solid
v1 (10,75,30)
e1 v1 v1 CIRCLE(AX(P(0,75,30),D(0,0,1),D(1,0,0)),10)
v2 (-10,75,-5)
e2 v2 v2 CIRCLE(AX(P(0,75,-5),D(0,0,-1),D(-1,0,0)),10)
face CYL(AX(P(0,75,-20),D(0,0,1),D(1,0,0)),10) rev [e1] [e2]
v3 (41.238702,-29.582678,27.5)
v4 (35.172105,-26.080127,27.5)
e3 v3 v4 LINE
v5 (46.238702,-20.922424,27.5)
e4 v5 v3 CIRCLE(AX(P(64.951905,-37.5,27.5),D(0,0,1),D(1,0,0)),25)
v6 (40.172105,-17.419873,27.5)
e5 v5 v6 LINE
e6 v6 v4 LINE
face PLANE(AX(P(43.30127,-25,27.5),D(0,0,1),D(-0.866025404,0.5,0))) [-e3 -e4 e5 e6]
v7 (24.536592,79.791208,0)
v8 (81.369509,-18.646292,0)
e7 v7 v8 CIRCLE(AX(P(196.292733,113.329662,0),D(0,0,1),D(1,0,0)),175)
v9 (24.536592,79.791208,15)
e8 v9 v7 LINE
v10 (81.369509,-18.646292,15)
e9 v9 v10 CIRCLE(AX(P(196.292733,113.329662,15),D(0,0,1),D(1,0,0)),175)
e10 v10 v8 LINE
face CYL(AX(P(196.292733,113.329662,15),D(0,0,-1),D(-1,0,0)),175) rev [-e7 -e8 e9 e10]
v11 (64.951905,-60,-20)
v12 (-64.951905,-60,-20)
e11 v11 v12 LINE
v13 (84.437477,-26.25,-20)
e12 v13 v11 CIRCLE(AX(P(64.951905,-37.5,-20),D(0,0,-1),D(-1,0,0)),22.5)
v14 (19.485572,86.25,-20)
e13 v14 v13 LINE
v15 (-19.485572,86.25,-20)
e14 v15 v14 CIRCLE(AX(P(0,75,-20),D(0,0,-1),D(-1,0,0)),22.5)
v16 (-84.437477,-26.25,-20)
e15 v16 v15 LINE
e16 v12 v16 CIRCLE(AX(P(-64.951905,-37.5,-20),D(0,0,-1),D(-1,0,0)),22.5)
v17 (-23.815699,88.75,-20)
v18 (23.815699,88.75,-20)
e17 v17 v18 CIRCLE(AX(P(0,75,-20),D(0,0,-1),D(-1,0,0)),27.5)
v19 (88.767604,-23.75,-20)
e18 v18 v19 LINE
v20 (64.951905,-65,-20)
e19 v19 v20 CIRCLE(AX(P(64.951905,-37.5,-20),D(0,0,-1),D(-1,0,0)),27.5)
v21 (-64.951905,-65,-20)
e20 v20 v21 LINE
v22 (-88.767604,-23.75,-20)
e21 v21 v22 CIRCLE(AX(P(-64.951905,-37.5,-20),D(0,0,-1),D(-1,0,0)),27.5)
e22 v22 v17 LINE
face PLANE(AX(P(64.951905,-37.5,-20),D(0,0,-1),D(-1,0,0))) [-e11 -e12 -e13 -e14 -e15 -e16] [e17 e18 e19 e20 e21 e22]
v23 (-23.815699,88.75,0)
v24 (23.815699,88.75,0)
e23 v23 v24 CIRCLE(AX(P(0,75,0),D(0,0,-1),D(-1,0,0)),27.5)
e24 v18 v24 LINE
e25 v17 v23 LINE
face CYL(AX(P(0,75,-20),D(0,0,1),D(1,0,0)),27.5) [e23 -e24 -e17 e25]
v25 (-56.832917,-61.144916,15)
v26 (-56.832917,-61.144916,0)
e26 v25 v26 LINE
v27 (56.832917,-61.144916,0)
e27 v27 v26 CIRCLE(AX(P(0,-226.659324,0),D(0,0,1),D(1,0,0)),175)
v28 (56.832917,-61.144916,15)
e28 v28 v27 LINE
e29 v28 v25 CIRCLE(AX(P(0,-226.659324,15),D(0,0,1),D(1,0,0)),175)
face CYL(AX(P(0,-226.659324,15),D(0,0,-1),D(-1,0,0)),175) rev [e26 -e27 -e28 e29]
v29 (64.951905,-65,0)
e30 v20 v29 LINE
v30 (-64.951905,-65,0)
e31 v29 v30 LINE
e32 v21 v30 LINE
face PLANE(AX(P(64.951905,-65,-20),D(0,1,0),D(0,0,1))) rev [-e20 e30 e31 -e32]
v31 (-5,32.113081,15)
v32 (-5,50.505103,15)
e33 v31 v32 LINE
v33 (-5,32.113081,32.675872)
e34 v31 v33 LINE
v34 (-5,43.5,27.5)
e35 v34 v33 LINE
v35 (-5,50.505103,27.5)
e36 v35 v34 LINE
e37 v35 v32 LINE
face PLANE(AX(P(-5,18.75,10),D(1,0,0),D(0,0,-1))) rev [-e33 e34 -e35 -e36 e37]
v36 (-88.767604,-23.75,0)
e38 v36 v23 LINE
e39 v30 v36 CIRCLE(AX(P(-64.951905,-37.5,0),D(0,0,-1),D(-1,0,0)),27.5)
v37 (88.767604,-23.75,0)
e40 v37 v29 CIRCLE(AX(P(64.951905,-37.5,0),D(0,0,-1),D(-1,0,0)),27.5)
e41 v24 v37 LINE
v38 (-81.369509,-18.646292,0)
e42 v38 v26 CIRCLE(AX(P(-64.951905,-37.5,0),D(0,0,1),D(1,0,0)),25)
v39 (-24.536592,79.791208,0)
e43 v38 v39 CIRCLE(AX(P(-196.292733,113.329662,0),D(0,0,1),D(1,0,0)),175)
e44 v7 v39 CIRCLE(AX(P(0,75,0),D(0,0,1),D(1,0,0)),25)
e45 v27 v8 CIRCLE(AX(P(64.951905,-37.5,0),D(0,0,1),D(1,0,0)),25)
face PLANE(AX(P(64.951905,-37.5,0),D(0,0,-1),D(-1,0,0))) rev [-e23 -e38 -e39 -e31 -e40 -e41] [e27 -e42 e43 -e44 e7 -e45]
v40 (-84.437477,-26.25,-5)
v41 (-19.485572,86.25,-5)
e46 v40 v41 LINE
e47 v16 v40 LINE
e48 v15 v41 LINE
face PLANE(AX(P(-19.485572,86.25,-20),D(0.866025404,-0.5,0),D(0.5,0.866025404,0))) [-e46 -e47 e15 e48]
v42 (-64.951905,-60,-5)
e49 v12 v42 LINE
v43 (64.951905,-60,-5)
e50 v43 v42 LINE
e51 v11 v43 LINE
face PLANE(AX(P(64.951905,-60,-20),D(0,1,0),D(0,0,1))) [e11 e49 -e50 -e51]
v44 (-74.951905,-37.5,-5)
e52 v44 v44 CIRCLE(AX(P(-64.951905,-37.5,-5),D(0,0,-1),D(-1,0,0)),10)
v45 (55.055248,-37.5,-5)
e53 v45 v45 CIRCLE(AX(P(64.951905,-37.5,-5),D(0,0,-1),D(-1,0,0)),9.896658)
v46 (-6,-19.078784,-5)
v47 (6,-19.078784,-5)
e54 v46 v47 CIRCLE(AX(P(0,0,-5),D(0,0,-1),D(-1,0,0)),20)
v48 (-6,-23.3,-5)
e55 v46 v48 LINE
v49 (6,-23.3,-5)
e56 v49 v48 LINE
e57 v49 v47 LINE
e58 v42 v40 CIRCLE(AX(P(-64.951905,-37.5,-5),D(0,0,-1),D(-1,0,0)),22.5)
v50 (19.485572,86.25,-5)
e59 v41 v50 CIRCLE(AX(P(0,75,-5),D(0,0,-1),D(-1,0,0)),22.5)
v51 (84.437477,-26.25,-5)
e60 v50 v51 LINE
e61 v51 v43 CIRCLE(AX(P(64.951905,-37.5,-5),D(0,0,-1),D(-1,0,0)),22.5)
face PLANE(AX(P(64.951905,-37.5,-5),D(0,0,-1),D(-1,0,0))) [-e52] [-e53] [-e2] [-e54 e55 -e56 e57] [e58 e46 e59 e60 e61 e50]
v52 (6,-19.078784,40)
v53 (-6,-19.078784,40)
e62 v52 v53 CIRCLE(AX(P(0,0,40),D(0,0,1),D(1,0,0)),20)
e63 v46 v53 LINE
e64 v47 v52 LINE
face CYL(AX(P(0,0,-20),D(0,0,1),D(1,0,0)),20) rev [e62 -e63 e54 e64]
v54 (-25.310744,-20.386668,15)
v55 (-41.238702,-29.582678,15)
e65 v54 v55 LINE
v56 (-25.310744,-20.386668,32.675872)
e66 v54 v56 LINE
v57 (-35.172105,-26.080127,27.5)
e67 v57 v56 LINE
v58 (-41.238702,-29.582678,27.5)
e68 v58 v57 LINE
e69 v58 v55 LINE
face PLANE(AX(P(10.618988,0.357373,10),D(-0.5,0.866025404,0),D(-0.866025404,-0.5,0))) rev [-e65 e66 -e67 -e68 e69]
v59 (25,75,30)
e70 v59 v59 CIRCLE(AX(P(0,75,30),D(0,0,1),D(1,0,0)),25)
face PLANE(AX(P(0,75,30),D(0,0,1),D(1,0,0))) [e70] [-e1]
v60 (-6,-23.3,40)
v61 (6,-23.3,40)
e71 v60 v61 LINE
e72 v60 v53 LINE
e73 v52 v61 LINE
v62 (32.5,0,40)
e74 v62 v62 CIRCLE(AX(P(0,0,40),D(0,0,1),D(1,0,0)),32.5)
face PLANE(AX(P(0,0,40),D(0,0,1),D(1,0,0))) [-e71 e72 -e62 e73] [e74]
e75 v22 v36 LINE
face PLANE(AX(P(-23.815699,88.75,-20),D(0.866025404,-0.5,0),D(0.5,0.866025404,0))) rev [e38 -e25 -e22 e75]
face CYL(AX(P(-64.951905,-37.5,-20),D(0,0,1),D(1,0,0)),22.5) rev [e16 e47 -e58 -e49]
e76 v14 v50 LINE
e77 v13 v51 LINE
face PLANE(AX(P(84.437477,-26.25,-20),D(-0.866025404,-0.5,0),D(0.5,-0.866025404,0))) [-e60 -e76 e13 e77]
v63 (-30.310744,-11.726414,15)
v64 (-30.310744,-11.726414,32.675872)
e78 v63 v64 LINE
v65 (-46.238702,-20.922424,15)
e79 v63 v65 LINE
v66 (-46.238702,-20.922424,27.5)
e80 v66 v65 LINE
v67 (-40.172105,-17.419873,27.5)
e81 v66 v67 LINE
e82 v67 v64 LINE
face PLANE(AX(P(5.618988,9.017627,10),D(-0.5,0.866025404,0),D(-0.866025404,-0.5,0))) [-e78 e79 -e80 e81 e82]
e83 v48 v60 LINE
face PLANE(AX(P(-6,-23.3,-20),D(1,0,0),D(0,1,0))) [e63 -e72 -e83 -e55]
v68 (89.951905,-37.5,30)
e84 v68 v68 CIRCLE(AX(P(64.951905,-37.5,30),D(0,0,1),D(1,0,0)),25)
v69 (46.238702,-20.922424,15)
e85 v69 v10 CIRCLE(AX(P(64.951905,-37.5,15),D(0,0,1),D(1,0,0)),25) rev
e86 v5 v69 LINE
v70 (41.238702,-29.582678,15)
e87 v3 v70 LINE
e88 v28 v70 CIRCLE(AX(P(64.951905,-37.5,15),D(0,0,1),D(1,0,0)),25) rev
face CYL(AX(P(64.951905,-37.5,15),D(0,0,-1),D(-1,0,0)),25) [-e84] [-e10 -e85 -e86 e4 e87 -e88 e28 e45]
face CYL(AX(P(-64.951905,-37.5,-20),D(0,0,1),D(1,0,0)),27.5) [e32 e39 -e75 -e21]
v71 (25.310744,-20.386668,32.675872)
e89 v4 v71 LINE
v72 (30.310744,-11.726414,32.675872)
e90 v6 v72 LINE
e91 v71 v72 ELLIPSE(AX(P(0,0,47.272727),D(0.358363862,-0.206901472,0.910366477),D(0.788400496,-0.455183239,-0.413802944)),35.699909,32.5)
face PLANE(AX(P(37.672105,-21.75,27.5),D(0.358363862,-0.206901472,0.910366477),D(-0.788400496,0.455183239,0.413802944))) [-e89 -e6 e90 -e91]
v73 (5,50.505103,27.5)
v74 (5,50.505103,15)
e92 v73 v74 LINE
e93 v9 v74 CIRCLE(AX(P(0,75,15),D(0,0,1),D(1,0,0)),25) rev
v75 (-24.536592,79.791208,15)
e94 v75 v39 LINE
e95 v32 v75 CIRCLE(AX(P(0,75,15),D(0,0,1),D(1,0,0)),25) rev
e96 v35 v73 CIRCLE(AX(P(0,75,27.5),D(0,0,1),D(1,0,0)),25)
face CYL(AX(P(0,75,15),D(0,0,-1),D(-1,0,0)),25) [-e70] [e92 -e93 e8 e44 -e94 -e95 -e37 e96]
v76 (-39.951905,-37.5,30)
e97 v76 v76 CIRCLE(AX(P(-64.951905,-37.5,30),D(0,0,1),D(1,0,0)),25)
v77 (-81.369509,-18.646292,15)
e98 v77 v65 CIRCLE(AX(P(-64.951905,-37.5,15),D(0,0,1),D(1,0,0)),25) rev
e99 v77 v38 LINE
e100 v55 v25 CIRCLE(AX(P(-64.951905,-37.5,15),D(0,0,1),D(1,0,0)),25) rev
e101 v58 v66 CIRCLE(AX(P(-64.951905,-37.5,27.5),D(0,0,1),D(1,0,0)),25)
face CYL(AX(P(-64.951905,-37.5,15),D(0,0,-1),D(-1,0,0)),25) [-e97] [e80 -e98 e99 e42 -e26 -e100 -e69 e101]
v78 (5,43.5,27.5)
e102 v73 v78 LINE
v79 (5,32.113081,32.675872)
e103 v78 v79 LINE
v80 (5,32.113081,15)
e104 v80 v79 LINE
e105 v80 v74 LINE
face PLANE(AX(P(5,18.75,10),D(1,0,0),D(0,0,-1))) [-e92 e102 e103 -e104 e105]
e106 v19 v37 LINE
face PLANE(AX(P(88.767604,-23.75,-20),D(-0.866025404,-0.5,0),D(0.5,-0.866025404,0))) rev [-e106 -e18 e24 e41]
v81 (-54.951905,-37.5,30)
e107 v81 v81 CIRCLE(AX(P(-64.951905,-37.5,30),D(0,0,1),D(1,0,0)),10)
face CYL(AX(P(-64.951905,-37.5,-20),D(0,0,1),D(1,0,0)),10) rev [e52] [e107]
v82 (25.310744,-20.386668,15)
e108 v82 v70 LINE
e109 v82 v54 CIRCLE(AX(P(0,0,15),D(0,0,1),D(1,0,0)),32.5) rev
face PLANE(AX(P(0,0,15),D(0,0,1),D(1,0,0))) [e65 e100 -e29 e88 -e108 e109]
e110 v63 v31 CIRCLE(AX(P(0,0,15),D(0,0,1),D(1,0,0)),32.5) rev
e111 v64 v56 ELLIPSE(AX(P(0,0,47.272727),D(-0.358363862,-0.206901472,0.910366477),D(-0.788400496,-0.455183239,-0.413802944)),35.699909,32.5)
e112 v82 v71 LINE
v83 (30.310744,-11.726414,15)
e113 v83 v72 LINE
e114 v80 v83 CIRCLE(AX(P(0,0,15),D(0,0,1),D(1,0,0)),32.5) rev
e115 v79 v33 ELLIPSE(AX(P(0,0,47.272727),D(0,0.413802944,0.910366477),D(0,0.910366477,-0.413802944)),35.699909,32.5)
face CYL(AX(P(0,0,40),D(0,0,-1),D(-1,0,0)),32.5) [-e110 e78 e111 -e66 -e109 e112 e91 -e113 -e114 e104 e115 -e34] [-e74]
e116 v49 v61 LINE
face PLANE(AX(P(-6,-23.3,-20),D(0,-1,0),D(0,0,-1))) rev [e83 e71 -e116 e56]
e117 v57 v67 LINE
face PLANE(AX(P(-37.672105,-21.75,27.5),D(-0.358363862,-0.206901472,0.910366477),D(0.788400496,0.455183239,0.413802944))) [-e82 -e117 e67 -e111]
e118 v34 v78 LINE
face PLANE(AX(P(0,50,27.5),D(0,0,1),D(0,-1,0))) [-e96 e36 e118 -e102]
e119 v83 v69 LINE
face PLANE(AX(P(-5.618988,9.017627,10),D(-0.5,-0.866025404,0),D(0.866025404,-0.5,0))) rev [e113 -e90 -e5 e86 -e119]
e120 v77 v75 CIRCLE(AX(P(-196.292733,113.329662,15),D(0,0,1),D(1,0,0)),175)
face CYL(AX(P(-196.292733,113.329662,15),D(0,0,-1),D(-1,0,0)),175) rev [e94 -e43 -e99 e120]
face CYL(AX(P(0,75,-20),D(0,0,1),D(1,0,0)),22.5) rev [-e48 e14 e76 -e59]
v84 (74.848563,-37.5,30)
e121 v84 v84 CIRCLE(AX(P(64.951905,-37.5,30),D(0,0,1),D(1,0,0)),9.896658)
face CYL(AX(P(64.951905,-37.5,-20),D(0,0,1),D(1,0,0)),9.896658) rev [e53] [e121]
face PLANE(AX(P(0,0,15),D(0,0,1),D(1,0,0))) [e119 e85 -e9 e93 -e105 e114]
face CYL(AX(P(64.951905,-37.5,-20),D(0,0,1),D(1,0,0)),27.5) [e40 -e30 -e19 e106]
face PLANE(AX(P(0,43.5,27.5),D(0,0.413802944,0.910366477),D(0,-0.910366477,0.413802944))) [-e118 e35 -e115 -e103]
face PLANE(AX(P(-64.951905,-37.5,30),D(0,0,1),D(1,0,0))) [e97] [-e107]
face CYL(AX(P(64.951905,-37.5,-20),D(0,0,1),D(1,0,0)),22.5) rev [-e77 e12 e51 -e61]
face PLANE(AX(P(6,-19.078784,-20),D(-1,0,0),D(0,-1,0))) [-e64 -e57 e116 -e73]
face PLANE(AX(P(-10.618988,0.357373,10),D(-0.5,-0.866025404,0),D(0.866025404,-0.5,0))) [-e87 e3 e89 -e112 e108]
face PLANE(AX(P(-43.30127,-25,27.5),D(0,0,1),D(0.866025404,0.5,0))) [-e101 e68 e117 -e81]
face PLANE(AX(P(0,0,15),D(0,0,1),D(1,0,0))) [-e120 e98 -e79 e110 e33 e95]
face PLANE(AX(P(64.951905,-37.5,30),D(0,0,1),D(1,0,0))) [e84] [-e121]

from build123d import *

# Parameters (mm, degrees)
BOSS_EXTRUDE2_DEPTH     = 15
SKETCH1_6_R             = 25
BOSS_EXTRUDE3_DEPTH     = 30
SKETCH1_7_R             = 32.5
BOSS_EXTRUDE4_DEPTH     = 40
BOSS_EXTRUDE5_DEPTH     = 20
SHELL1_T                = -5
RIB1_START              = -5
RIB1_DEPTH              = 10
CIRPATTERN1_COUNT       = 3
CUT_EXTRUDE1_DEPTH      = 144.713620755
CUT_EXTRUDE1_DEPTH_BACK = 144.713620755
SKETCH1_8_R             = 10
SKETCH1_8_R_2           = 9.896657658
KEYWAY_DEPTH            = 161.809545085


# Read off the part's stored shape, not the designer's step: Rib1
with BuildPart() as part:
    # Sketch1 → Boss-Extrude2 (new body)
    with BuildSketch(Plane.XY):
        with BuildLine():
            ThreePointArc((24.536591615, 79.791207774), (0, 100), (-24.536591615, 79.791207774))
            ThreePointArc((-24.536591615, 79.791207774), (-44.738287256, 25.82966219), (-81.369508738, -18.646292226))
            ThreePointArc((-81.369508738, -18.646292226), (-86.602540378, -50), (-56.832917123, -61.144915548))
            ThreePointArc((-56.832917123, -61.144915548), (0, -51.65932438), (56.832917123, -61.144915548))
            ThreePointArc((56.832917123, -61.144915548), (86.602540378, -50), (81.369508738, -18.646292226))
            ThreePointArc((81.369508738, -18.646292226), (44.738287256, 25.82966219), (24.536591615, 79.791207774))
        make_face()
    extrude(amount=BOSS_EXTRUDE2_DEPTH)

    # Sketch1<6> → Boss-Extrude3 (add)
    with BuildSketch(Plane.XY):
        with Locations(Location((0, 75, 0), (0, 0, 168.951006611))):
            Circle(SKETCH1_6_R)
        with Locations(Location((64.951905284, -37.5, 0), (0, 0, 251.048993389))):
            Circle(SKETCH1_6_R)
        with Locations(Location((-64.951905284, -37.5, 0), (0, 0, 131.048993389))):
            Circle(SKETCH1_6_R)
    extrude(amount=BOSS_EXTRUDE3_DEPTH)

    # Sketch1<7> → Boss-Extrude4 (add)
    with BuildSketch(Plane.XY):
        Circle(SKETCH1_7_R)
    extrude(amount=BOSS_EXTRUDE4_DEPTH)


with BuildPart() as body_2:
    # Sketch2 → Boss-Extrude5 (new body)
    with BuildSketch(Plane(origin=(0, 0, 0), x_dir=(-1, 0, 0), z_dir=(0, 0, -1))):
        with BuildLine():
            Line((-88.767603888, -23.75), (-23.815698604, 88.75))
            ThreePointArc((-23.815698604, 88.75), (0, 102.5), (23.815698604, 88.75))
            Line((23.815698604, 88.75), (88.767603888, -23.75))
            ThreePointArc((88.767603888, -23.75), (88.767603888, -51.25), (64.951905284, -65))
            Line((64.951905284, -65), (-64.951905284, -65))
            ThreePointArc((-64.951905284, -65), (-88.767603888, -51.25), (-88.767603888, -23.75))
        make_face()
    extrude(amount=BOSS_EXTRUDE5_DEPTH)

    # Shell1
    shell1_openings = [body_2.faces().sort_by_distance(p)[0] for p in [
        (0, 0, -20),
    ]]
    offset(amount=SHELL1_T, openings=shell1_openings, kind=Kind.INTERSECTION)

    # Combine1: union part
    add(part.part)

    # Rib1 outline → Rib1 (add)
    with BuildSketch(Plane(origin=(0, 0, 0), x_dir=(0, 0, -1), z_dir=(1, 0, 0)).offset(RIB1_START)):
        Polygon((-27.5, 52), (-27.5, 43.5), (-32.67587207, 32.113081447), (-33.181818182, 31), (-15, 31), (-15, 52), align=None)
    rib1 = extrude(amount=RIB1_DEPTH)

    # CirPattern1: Rib1 ×3 about axis
    cirpattern1_axis = Axis((0, 0, 0), (0, 0, 1))
    for i in range(1, CIRPATTERN1_COUNT):
        add(rib1.rotate(cirpattern1_axis, i * 360 / CIRPATTERN1_COUNT))

    # Sketch1<8> → Cut-Extrude1 (cut, two sides: drawn at the far end of the back side and taken through both)
    with BuildSketch(Plane.XY.offset(-CUT_EXTRUDE1_DEPTH_BACK)):
        with Locations((0, 75)):
            Circle(SKETCH1_8_R)
        with Locations((-64.951905284, -37.5)):
            Circle(SKETCH1_8_R)
        with Locations((64.951905284, -37.5)):
            Circle(SKETCH1_8_R_2)
    extrude(amount=CUT_EXTRUDE1_DEPTH + CUT_EXTRUDE1_DEPTH_BACK, mode=Mode.SUBTRACT)

    # KeySketch → Keyway (cut, through all)
    with BuildSketch(Plane(origin=(-6.035211163, -9.571395477, 40), x_dir=(1, 0, 0), z_dir=(0, 0, 1))):
        with BuildLine():
            Line((12.035211163, -9.507388551), (12.035211163, -13.728604523))
            Line((12.035211163, -13.728604523), (0.035211163, -13.728604523))
            Line((0.035211163, -13.728604523), (0.035211163, -9.507388551))
            ThreePointArc((0.035211163, -9.507388551), (6.035211163, 29.571395477), (12.035211163, -9.507388551))
        make_face()
    extrude(amount=-KEYWAY_DEPTH, mode=Mode.SUBTRACT)


solid = body_2.part
